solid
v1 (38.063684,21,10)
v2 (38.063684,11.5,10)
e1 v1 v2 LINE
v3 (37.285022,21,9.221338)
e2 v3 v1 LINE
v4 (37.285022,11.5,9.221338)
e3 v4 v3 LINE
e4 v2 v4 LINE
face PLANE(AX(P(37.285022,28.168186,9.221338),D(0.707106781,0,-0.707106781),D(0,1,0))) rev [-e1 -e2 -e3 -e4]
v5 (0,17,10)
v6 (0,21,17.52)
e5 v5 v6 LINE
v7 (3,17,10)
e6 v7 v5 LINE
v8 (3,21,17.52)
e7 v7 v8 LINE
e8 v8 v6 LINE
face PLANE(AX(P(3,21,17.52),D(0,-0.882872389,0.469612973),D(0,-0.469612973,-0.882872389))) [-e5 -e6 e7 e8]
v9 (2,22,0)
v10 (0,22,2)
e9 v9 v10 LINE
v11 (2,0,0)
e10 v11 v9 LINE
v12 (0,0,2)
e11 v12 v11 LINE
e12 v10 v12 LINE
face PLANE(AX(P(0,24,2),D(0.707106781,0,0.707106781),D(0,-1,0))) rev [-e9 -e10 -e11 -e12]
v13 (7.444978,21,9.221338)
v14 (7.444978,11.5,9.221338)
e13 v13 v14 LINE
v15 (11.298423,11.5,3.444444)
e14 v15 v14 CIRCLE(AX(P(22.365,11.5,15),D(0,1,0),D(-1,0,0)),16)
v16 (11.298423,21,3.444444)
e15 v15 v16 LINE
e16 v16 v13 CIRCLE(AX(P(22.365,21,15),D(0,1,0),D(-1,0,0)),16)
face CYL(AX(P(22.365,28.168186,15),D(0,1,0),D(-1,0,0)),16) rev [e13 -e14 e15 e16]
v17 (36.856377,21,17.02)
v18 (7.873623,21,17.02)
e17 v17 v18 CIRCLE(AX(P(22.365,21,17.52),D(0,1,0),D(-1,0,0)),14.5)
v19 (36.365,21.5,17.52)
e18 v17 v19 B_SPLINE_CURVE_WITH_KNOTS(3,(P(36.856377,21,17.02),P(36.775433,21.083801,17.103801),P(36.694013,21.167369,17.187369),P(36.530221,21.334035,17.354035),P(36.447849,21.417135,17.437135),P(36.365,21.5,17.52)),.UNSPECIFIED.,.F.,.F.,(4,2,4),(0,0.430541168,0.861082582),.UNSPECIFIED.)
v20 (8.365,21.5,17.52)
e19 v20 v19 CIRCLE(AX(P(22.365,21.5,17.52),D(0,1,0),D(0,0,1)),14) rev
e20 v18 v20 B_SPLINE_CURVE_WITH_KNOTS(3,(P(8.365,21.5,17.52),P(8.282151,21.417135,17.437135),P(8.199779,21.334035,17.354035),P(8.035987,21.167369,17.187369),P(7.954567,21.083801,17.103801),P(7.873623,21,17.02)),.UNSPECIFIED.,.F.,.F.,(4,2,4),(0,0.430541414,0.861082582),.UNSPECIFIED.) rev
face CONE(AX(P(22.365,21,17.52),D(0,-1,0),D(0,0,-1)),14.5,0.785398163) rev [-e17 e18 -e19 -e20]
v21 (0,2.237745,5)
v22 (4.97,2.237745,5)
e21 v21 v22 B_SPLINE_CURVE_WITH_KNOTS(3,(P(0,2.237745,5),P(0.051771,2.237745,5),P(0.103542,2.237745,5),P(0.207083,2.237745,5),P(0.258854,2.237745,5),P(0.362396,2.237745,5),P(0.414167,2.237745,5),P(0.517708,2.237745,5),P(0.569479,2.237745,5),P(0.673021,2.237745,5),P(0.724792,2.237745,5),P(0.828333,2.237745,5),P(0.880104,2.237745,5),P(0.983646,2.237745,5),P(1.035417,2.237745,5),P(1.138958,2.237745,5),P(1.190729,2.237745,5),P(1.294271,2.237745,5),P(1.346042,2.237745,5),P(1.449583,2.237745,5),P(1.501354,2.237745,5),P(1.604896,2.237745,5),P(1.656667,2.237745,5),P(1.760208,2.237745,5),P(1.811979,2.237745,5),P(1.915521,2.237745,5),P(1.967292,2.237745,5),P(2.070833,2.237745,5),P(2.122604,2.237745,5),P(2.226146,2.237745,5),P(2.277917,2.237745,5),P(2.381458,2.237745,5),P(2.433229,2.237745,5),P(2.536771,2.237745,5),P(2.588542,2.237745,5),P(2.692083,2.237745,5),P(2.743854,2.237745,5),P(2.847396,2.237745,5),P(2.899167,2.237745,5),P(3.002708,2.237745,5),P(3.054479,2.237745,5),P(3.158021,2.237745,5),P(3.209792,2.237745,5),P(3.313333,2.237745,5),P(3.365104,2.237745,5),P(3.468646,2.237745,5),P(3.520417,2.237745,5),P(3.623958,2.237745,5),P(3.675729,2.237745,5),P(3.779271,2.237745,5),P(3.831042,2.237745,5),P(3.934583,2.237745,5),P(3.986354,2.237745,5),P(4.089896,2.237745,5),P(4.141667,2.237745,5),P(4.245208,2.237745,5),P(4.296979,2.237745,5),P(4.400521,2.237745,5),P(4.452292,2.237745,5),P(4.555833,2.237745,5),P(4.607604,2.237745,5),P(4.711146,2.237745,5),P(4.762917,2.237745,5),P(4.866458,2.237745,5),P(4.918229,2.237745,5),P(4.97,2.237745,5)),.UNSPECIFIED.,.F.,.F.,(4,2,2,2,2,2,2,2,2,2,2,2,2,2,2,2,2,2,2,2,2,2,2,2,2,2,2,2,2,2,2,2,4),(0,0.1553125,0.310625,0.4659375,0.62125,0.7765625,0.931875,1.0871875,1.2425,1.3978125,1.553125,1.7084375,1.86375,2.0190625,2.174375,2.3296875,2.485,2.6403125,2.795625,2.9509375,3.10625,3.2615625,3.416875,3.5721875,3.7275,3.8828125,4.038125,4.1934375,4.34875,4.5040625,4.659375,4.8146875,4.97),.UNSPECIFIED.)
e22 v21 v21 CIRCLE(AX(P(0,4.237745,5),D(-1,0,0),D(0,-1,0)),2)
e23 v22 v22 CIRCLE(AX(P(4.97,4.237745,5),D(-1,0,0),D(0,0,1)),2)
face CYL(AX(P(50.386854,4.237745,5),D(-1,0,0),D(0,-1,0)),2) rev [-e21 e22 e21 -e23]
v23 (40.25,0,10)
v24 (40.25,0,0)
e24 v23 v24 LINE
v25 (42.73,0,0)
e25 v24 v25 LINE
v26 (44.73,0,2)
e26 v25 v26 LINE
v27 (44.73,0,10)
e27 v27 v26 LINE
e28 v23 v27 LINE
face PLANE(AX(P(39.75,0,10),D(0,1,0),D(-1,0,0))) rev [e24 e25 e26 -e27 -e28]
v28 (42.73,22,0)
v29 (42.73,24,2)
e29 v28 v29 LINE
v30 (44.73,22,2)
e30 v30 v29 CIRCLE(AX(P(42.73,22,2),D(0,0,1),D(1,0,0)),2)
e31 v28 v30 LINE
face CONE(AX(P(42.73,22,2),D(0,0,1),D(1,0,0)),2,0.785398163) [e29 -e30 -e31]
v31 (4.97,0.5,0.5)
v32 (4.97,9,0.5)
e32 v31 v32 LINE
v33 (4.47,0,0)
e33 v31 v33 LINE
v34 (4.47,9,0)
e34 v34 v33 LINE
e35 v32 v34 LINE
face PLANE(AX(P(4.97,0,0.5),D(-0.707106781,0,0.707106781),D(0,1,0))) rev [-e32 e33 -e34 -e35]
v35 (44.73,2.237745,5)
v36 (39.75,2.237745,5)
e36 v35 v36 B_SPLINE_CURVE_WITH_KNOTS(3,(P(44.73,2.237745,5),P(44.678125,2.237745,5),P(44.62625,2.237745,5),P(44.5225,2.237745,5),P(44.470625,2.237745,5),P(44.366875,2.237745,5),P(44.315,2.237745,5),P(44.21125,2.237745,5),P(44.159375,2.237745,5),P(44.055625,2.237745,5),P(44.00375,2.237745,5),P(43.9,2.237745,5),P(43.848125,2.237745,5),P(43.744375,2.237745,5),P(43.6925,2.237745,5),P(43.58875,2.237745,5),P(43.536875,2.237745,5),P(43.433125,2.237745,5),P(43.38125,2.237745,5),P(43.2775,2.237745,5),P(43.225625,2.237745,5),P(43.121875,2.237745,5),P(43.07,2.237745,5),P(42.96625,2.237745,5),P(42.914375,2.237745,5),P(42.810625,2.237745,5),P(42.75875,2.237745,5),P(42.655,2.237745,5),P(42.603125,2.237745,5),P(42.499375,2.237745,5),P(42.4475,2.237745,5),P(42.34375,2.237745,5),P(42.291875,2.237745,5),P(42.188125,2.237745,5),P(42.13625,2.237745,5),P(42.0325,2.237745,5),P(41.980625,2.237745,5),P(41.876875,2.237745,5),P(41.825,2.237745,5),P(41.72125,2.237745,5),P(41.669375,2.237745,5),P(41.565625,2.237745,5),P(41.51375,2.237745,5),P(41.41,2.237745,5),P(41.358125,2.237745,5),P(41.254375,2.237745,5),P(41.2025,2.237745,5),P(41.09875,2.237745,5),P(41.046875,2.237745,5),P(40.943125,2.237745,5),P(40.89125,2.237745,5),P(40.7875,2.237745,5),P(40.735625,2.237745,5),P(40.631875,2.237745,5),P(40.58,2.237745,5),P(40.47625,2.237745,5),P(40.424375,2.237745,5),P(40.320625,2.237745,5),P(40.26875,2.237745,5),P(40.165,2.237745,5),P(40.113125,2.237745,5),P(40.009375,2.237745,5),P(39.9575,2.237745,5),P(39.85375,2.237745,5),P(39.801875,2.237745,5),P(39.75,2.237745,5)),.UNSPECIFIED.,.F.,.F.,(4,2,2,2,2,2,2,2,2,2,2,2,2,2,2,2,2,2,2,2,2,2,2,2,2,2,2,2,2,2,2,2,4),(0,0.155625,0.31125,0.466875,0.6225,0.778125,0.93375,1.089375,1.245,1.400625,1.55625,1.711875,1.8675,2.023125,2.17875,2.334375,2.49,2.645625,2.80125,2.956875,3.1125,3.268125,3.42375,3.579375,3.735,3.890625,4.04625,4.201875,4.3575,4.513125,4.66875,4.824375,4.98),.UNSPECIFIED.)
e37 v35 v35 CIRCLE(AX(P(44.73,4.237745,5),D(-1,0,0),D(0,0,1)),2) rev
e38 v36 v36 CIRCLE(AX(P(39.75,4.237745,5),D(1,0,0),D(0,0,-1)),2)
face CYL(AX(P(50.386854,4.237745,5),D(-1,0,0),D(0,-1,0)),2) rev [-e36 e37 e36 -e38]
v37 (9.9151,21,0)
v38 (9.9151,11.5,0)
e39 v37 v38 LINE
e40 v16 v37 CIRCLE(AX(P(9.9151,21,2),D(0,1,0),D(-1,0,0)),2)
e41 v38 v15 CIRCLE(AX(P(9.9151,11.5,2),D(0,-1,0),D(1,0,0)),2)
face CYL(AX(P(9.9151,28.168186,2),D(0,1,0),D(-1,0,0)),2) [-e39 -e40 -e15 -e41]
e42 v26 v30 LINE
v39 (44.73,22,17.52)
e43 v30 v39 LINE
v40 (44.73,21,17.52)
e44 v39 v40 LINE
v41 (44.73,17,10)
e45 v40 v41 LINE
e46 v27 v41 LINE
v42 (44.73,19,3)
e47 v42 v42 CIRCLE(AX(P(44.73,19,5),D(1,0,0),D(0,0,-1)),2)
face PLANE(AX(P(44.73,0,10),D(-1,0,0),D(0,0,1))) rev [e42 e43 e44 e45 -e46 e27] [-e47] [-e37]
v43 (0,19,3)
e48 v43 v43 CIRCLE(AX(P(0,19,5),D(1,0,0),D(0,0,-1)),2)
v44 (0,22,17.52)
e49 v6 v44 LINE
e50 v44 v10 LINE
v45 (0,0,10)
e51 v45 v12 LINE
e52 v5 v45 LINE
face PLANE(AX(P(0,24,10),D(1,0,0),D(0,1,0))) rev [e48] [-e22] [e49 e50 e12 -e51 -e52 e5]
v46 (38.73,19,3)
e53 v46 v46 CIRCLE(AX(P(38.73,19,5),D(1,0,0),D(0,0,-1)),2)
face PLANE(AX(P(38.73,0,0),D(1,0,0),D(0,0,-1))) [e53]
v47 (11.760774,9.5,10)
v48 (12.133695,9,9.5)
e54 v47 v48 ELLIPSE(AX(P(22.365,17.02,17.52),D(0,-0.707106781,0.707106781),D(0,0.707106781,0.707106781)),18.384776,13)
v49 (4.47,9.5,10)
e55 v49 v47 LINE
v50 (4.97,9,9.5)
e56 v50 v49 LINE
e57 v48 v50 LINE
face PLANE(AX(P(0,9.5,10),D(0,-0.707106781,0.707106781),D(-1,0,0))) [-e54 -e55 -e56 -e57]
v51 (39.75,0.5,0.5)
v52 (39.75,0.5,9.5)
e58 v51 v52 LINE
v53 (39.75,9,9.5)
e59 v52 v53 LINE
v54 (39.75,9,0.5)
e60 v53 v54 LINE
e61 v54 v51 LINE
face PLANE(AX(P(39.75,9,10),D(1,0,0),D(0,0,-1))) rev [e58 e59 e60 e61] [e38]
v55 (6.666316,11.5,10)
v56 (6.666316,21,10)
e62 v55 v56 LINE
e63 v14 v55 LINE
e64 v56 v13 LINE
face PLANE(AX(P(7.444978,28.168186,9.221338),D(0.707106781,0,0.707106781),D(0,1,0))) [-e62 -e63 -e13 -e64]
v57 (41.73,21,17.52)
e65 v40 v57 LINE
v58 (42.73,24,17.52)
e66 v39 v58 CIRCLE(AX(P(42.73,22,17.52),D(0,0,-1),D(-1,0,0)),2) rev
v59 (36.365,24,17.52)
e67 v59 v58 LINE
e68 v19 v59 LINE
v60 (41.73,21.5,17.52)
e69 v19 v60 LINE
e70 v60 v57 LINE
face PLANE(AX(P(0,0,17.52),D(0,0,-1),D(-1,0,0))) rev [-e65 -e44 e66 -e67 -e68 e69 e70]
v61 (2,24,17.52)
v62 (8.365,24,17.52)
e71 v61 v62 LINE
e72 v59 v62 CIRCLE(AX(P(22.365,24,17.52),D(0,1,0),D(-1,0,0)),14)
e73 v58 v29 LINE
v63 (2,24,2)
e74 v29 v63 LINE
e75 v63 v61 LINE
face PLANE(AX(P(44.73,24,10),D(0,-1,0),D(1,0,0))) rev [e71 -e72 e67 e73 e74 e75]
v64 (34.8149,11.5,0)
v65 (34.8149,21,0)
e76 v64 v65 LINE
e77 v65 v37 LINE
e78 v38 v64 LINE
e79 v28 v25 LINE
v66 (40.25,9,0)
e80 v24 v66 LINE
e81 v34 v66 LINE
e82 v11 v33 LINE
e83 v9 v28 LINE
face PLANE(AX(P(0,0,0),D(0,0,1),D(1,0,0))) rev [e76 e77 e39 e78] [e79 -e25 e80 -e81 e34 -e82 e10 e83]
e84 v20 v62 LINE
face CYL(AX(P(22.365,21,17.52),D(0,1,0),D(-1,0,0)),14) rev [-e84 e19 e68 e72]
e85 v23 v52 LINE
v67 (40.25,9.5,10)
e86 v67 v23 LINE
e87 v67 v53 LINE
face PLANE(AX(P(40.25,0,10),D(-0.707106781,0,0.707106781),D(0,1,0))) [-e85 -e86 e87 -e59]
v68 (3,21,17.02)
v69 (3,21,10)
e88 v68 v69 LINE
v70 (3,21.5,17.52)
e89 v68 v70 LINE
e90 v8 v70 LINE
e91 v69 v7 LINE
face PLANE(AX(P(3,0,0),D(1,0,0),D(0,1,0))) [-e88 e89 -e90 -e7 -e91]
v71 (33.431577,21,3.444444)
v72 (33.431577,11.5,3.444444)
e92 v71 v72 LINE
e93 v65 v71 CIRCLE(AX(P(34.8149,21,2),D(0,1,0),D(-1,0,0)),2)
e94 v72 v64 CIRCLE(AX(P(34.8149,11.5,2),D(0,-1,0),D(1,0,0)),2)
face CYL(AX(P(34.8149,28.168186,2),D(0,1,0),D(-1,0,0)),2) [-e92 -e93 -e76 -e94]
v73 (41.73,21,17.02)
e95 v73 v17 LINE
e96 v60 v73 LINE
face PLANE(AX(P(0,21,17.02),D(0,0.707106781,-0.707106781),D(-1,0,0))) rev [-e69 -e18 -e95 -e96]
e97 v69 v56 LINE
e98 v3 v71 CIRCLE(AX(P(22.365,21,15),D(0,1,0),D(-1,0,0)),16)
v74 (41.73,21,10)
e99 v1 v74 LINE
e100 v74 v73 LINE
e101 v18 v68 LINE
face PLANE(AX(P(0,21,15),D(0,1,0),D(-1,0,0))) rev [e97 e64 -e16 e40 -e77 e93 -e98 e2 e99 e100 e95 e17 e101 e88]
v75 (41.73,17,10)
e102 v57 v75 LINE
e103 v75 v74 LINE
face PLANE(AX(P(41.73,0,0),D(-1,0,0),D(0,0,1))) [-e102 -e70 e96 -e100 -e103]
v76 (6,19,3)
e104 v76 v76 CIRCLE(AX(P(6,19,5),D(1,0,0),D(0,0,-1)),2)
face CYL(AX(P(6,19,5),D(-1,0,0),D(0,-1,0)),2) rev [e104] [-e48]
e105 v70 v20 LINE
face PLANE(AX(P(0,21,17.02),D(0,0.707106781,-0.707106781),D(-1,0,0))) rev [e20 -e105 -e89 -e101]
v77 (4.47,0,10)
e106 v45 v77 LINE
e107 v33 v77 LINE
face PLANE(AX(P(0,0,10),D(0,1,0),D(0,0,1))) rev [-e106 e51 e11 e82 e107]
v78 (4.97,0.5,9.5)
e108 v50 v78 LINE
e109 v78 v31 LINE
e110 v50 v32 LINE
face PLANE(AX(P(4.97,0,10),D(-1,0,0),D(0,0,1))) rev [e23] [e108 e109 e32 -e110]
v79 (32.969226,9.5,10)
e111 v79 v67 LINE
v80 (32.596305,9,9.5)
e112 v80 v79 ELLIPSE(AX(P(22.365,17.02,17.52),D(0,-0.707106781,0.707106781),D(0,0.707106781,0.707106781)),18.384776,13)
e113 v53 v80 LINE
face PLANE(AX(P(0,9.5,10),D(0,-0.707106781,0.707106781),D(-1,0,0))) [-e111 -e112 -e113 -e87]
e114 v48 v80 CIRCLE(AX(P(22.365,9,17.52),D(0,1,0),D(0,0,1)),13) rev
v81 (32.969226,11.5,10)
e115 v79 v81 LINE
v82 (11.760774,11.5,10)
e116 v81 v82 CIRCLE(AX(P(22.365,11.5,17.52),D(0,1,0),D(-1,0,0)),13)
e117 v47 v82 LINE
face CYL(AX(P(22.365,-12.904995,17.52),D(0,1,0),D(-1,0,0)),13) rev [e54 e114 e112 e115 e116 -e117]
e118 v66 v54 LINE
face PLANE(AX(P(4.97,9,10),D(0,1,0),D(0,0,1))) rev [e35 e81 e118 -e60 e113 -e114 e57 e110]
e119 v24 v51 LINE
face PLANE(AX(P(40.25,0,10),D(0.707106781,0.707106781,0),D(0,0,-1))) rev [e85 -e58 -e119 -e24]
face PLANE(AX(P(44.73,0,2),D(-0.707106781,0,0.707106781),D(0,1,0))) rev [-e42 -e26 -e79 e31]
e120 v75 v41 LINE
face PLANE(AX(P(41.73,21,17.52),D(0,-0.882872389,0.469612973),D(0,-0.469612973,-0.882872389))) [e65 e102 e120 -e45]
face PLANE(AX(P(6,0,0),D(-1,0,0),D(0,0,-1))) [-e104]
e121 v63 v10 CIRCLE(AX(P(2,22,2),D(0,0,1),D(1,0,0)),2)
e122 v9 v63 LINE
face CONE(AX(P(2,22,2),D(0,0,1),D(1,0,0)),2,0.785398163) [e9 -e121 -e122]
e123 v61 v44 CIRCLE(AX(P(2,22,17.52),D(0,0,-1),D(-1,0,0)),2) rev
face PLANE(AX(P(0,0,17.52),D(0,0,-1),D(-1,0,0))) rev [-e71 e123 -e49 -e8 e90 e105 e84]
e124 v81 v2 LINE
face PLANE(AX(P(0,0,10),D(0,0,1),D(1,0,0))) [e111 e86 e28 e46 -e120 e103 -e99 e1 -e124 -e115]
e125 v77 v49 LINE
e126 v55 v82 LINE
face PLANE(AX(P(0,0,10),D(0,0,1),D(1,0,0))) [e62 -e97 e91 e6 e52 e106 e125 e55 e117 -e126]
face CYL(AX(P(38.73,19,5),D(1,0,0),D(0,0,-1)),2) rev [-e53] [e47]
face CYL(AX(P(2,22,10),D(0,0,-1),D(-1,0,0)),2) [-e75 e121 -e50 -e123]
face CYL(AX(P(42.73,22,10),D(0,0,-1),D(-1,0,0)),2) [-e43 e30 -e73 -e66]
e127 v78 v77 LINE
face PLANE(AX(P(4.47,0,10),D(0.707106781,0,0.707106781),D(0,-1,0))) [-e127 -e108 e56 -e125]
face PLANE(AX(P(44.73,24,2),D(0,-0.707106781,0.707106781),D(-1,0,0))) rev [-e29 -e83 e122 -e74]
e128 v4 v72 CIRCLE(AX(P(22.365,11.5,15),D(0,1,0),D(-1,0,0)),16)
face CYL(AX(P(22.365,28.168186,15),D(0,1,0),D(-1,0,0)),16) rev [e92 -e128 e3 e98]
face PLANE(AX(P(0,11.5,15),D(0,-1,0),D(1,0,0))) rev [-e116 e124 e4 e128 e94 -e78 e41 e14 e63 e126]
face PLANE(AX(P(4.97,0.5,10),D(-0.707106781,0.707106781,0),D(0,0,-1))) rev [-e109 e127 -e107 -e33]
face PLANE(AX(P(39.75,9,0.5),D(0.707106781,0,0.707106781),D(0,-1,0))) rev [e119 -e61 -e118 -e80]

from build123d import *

# Parameters (mm, degrees)
EXTRUDE_1_DEPTH     = 10
SKETCH_2_W          = 16
SKETCH_2_H          = 9.5
EXTRUDE_2_DEPTH     = 17.52
CUT_EXTRUDE_1_DEPTH = 3
CUT_EXTRUDE_2_DEPTH = 2.5
EXTRUDE_3_DEPTH     = 3
EXTRUDE_4_DEPTH     = 3
FILLET_1_R          = 2
CHAMFER_1_SIZE      = 2
CUT_EXTRUDE_3_DEPTH = 6
CUT_EXTRUDE_4_REACH = 55.7
CHAMFER_2_SIZE      = 0.5
FILLET_2_R          = 2


# Some blends are built 0.0001 mm under size
with BuildPart() as part:
    # 草图1 → 凸台-拉伸1 (new body)
    with BuildSketch(Plane.XY):
        Polygon((0, 0), (4.97, 0), (4.97, 9), (39.75, 9), (39.75, 0), (44.73, 0), (44.73, 24), (0, 24), align=None)
    extrude(amount=EXTRUDE_1_DEPTH)

    # 草图2 → 切除-旋转2 (revolve, cut)
    with BuildSketch(Plane(origin=(0, 0, 15), x_dir=(-1, 0, 0), z_dir=(0, 0, -1))):
        with Locations((-14.365, 16.25)):
            Rectangle(SKETCH_2_W, SKETCH_2_H)
    revolve(axis=Axis((22.365, 28.168186047, 15), (0, -1, 0)), mode=Mode.SUBTRACT)

    # 草图4 → 凸台-拉伸2 (add)
    with BuildSketch(Plane(origin=(0, 0, 0), x_dir=(-1, 0, 0), z_dir=(0, 0, -1))):
        Polygon((-44.73, 24), (0, 24), (0, 21), (-7.166315846, 21), (-37.563684154, 21), (-44.73, 21), align=None)
    extrude(amount=-EXTRUDE_2_DEPTH)

    # 草图5 → 切除-拉伸1 (cut)
    with BuildSketch(Plane(origin=(0, 24, 0), x_dir=(1, 0, 0), z_dir=(0, 1, 0))):
        with BuildLine():
            Line((8.365, -17.52), (36.365, -17.52))
            ThreePointArc((36.365, -17.52), (22.365, -3.52), (8.365, -17.52))
        make_face()
    extrude(amount=-CUT_EXTRUDE_1_DEPTH, mode=Mode.SUBTRACT)

    # 草图6 → 切除-拉伸2 (cut)
    with BuildSketch(Plane(origin=(0, 11.5, 0), x_dir=(1, 0, 0), z_dir=(0, 1, 0))):
        with BuildLine():
            ThreePointArc((32.969225573, -10), (22.365, -4.52), (11.760774427, -10))
            Line((11.760774427, -10), (32.969225573, -10))
        make_face()
    extrude(amount=-CUT_EXTRUDE_2_DEPTH, mode=Mode.SUBTRACT)

    # 草图7 → 凸台-拉伸3 (add)
    with BuildSketch(Plane.ZY):
        Polygon((10, 17), (10, 21), (17.52, 21), align=None)
    extrude(amount=-EXTRUDE_3_DEPTH)

    # 草图8 → 凸台-拉伸4 (add)
    with BuildSketch(Plane(origin=(44.73, 0, 0), x_dir=(0, 0, -1), z_dir=(1, 0, 0))):
        Polygon((-17.52, 21), (-10, 17), (-10, 21), align=None)
    extrude(amount=-EXTRUDE_4_DEPTH)

    # 圆角1
    fillet_1_edges = [part.edges().sort_by_distance(p)[0] for p in [
        (0, 24, 8.76),
        (44.73, 24, 8.76),
    ]]
    fillet(fillet_1_edges, radius=FILLET_1_R)

    # 倒角1
    chamfer_1_edges = [part.edges().sort_by_distance(p)[0] for p in [
        (22.365, 24, 0),
        (0, 11, 0),
        (0.585786438, 23.414213562, 0),
        (44.144213562, 23.414213562, 0),
        (44.73, 11, 0),
    ]]
    chamfer(chamfer_1_edges, length=CHAMFER_1_SIZE - 0.0001)  # a hair under: the kernel refuses the full size

    # 草图9 → 切除-拉伸3 (cut)
    with BuildSketch(Plane(origin=(44.73, 0, 0), x_dir=(0, 0, -1), z_dir=(1, 0, 0))):
        with BuildLine():
            ThreePointArc((-6.414213562, 17.585786438), (-5, 17), (-3.585786438, 17.585786438))
            Line((-3.585786438, 17.585786438), (-5, 19))
            Line((-5, 19), (-6.414213562, 17.585786438))
        make_face()
        with BuildLine():
            Line((-5, 19), (-3.585786438, 17.585786438))
            ThreePointArc((-3.585786438, 17.585786438), (-3.152240935, 18.234633135), (-3, 19))
            ThreePointArc((-3, 19), (-3.152240935, 19.765366865), (-3.585786438, 20.414213562))
            Line((-3.585786438, 20.414213562), (-5, 19))
        make_face()
        with BuildLine():
            ThreePointArc((-6.414213562, 20.414213562), (-7, 19), (-6.414213562, 17.585786438))
            Line((-6.414213562, 17.585786438), (-5, 19))
            Line((-5, 19), (-6.414213562, 20.414213562))
        make_face()
        with BuildLine():
            Line((-6.414213562, 20.414213562), (-5, 19))
            Line((-5, 19), (-3.585786438, 20.414213562))
            ThreePointArc((-3.585786438, 20.414213562), (-5, 21), (-6.414213562, 20.414213562))
        make_face()
    cut_extrude_3 = extrude(amount=-CUT_EXTRUDE_3_DEPTH, mode=Mode.SUBTRACT)

    # 镜向1: 切除-拉伸3 across plane
    add(cut_extrude_3.mirror(Plane(origin=(22.365, 0, 0), x_dir=(0, 0, 1), z_dir=(1, 0, 0))), mode=Mode.SUBTRACT)

    # 切除-拉伸4: up to this face of the body (flat: up to its plane)
    cut_extrude_4_end = Plane(part.part.faces().sort_by_distance((44.73, 11.584828714, 6.907402267))[0])
    # 草图10 → 切除-拉伸4 (cut, up to the picked face)
    with BuildSketch(Plane.ZY, mode=Mode.PRIVATE) as cut_extrude_4_sk1:
        with BuildLine():
            ThreePointArc((3.474277506, 2.944620168), (5, 2.237744629), (6.525722494, 2.944620168))
            Line((6.525722494, 2.944620168), (5, 4.237744629))
            Line((5, 4.237744629), (3.474277506, 2.944620168))
        make_face()
    cut_extrude_4_tool1 = split(extrude(cut_extrude_4_sk1.sketch, amount=-CUT_EXTRUDE_4_REACH, mode=Mode.PRIVATE), bisect_by=cut_extrude_4_end, keep=Keep.BOTH, mode=Mode.PRIVATE)
    # 草图10 → 切除-拉伸4 (cut, up to the picked face)
    with BuildSketch(Plane.ZY, mode=Mode.PRIVATE) as cut_extrude_4_sk2:
        with BuildLine():
            Line((5, 4.237744629), (6.525722494, 2.944620168))
            ThreePointArc((6.525722494, 2.944620168), (6.877690734, 3.549066543), (7, 4.237744629))
            ThreePointArc((7, 4.237744629), (6.877690734, 4.926422715), (6.525722494, 5.53086909))
            Line((6.525722494, 5.53086909), (5, 4.237744629))
        make_face()
    cut_extrude_4_tool2 = split(extrude(cut_extrude_4_sk2.sketch, amount=-CUT_EXTRUDE_4_REACH, mode=Mode.PRIVATE), bisect_by=cut_extrude_4_end, keep=Keep.BOTH, mode=Mode.PRIVATE)
    # 草图10 → 切除-拉伸4 (cut, up to the picked face)
    with BuildSketch(Plane.ZY, mode=Mode.PRIVATE) as cut_extrude_4_sk3:
        with BuildLine():
            ThreePointArc((3.474277506, 5.53086909), (3, 4.237744629), (3.474277506, 2.944620168))
            Line((3.474277506, 2.944620168), (5, 4.237744629))
            Line((5, 4.237744629), (3.474277506, 5.53086909))
        make_face()
    cut_extrude_4_tool3 = split(extrude(cut_extrude_4_sk3.sketch, amount=-CUT_EXTRUDE_4_REACH, mode=Mode.PRIVATE), bisect_by=cut_extrude_4_end, keep=Keep.BOTH, mode=Mode.PRIVATE)
    # 草图10 → 切除-拉伸4 (cut, up to the picked face)
    with BuildSketch(Plane.ZY, mode=Mode.PRIVATE) as cut_extrude_4_sk4:
        with BuildLine():
            Line((5, 4.237744629), (6.525722494, 5.53086909))
            ThreePointArc((6.525722494, 5.53086909), (5, 6.237744629), (3.474277506, 5.53086909))
            Line((3.474277506, 5.53086909), (5, 4.237744629))
        make_face()
    cut_extrude_4_tool4 = split(extrude(cut_extrude_4_sk4.sketch, amount=-CUT_EXTRUDE_4_REACH, mode=Mode.PRIVATE), bisect_by=cut_extrude_4_end, keep=Keep.BOTH, mode=Mode.PRIVATE)
    # 草图10 → 切除-拉伸4 (cut, up to the picked face)
    with BuildSketch(Plane.ZY, mode=Mode.PRIVATE) as cut_extrude_4_sk5:
        with BuildLine():
            ThreePointArc((3.474277506, 2.944620168), (5, 2.237744629), (6.525722494, 2.944620168))
            Line((6.525722494, 2.944620168), (5, 4.237744629))
            Line((5, 4.237744629), (3.474277506, 2.944620168))
        make_face()
    cut_extrude_4_tool5 = split(extrude(cut_extrude_4_sk5.sketch, amount=-CUT_EXTRUDE_4_REACH, mode=Mode.PRIVATE), bisect_by=cut_extrude_4_end, keep=Keep.BOTH, mode=Mode.PRIVATE)
    # 草图10 → 切除-拉伸4 (cut, up to the picked face)
    with BuildSketch(Plane.ZY, mode=Mode.PRIVATE) as cut_extrude_4_sk6:
        with BuildLine():
            Line((5, 4.237744629), (6.525722494, 2.944620168))
            ThreePointArc((6.525722494, 2.944620168), (6.877690734, 3.549066543), (7, 4.237744629))
            ThreePointArc((7, 4.237744629), (6.877690734, 4.926422715), (6.525722494, 5.53086909))
            Line((6.525722494, 5.53086909), (5, 4.237744629))
        make_face()
    cut_extrude_4_tool6 = split(extrude(cut_extrude_4_sk6.sketch, amount=-CUT_EXTRUDE_4_REACH, mode=Mode.PRIVATE), bisect_by=cut_extrude_4_end, keep=Keep.BOTH, mode=Mode.PRIVATE)
    # 草图10 → 切除-拉伸4 (cut, up to the picked face)
    with BuildSketch(Plane.ZY, mode=Mode.PRIVATE) as cut_extrude_4_sk7:
        with BuildLine():
            ThreePointArc((3.474277506, 5.53086909), (3, 4.237744629), (3.474277506, 2.944620168))
            Line((3.474277506, 2.944620168), (5, 4.237744629))
            Line((5, 4.237744629), (3.474277506, 5.53086909))
        make_face()
    cut_extrude_4_tool7 = split(extrude(cut_extrude_4_sk7.sketch, amount=-CUT_EXTRUDE_4_REACH, mode=Mode.PRIVATE), bisect_by=cut_extrude_4_end, keep=Keep.BOTH, mode=Mode.PRIVATE)
    # 草图10 → 切除-拉伸4 (cut, up to the picked face)
    with BuildSketch(Plane.ZY, mode=Mode.PRIVATE) as cut_extrude_4_sk8:
        with BuildLine():
            Line((5, 4.237744629), (6.525722494, 5.53086909))
            ThreePointArc((6.525722494, 5.53086909), (5, 6.237744629), (3.474277506, 5.53086909))
            Line((3.474277506, 5.53086909), (5, 4.237744629))
        make_face()
    cut_extrude_4_tool8 = split(extrude(cut_extrude_4_sk8.sketch, amount=-CUT_EXTRUDE_4_REACH, mode=Mode.PRIVATE), bisect_by=cut_extrude_4_end, keep=Keep.BOTH, mode=Mode.PRIVATE)
    # 草图10 → 切除-拉伸4 (cut, up to the picked face)
    with BuildSketch(Plane.ZY, mode=Mode.PRIVATE) as cut_extrude_4_sk9:
        with BuildLine():
            ThreePointArc((3.474277506, 2.944620168), (5, 2.237744629), (6.525722494, 2.944620168))
            Line((6.525722494, 2.944620168), (5, 4.237744629))
            Line((5, 4.237744629), (3.474277506, 2.944620168))
        make_face()
    cut_extrude_4_tool9 = split(extrude(cut_extrude_4_sk9.sketch, amount=-CUT_EXTRUDE_4_REACH, mode=Mode.PRIVATE), bisect_by=cut_extrude_4_end, keep=Keep.BOTH, mode=Mode.PRIVATE)
    # 草图10 → 切除-拉伸4 (cut, up to the picked face)
    with BuildSketch(Plane.ZY, mode=Mode.PRIVATE) as cut_extrude_4_sk10:
        with BuildLine():
            Line((5, 4.237744629), (6.525722494, 2.944620168))
            ThreePointArc((6.525722494, 2.944620168), (6.877690734, 3.549066543), (7, 4.237744629))
            ThreePointArc((7, 4.237744629), (6.877690734, 4.926422715), (6.525722494, 5.53086909))
            Line((6.525722494, 5.53086909), (5, 4.237744629))
        make_face()
    cut_extrude_4_tool10 = split(extrude(cut_extrude_4_sk10.sketch, amount=-CUT_EXTRUDE_4_REACH, mode=Mode.PRIVATE), bisect_by=cut_extrude_4_end, keep=Keep.BOTH, mode=Mode.PRIVATE)
    # 草图10 → 切除-拉伸4 (cut, up to the picked face)
    with BuildSketch(Plane.ZY, mode=Mode.PRIVATE) as cut_extrude_4_sk11:
        with BuildLine():
            ThreePointArc((3.474277506, 5.53086909), (3, 4.237744629), (3.474277506, 2.944620168))
            Line((3.474277506, 2.944620168), (5, 4.237744629))
            Line((5, 4.237744629), (3.474277506, 5.53086909))
        make_face()
    cut_extrude_4_tool11 = split(extrude(cut_extrude_4_sk11.sketch, amount=-CUT_EXTRUDE_4_REACH, mode=Mode.PRIVATE), bisect_by=cut_extrude_4_end, keep=Keep.BOTH, mode=Mode.PRIVATE)
    # 草图10 → 切除-拉伸4 (cut, up to the picked face)
    with BuildSketch(Plane.ZY, mode=Mode.PRIVATE) as cut_extrude_4_sk12:
        with BuildLine():
            Line((5, 4.237744629), (6.525722494, 5.53086909))
            ThreePointArc((6.525722494, 5.53086909), (5, 6.237744629), (3.474277506, 5.53086909))
            Line((3.474277506, 5.53086909), (5, 4.237744629))
        make_face()
    cut_extrude_4_tool12 = split(extrude(cut_extrude_4_sk12.sketch, amount=-CUT_EXTRUDE_4_REACH, mode=Mode.PRIVATE), bisect_by=cut_extrude_4_end, keep=Keep.BOTH, mode=Mode.PRIVATE)
    # 草图10 → 切除-拉伸4 (cut, up to the picked face)
    with BuildSketch(Plane.ZY, mode=Mode.PRIVATE) as cut_extrude_4_sk13:
        with BuildLine():
            ThreePointArc((3.474277506, 2.944620168), (5, 2.237744629), (6.525722494, 2.944620168))
            Line((6.525722494, 2.944620168), (5, 4.237744629))
            Line((5, 4.237744629), (3.474277506, 2.944620168))
        make_face()
    cut_extrude_4_tool13 = split(extrude(cut_extrude_4_sk13.sketch, amount=-CUT_EXTRUDE_4_REACH, mode=Mode.PRIVATE), bisect_by=cut_extrude_4_end, keep=Keep.BOTH, mode=Mode.PRIVATE)
    # 草图10 → 切除-拉伸4 (cut, up to the picked face)
    with BuildSketch(Plane.ZY, mode=Mode.PRIVATE) as cut_extrude_4_sk14:
        with BuildLine():
            Line((5, 4.237744629), (6.525722494, 2.944620168))
            ThreePointArc((6.525722494, 2.944620168), (6.877690734, 3.549066543), (7, 4.237744629))
            ThreePointArc((7, 4.237744629), (6.877690734, 4.926422715), (6.525722494, 5.53086909))
            Line((6.525722494, 5.53086909), (5, 4.237744629))
        make_face()
    cut_extrude_4_tool14 = split(extrude(cut_extrude_4_sk14.sketch, amount=-CUT_EXTRUDE_4_REACH, mode=Mode.PRIVATE), bisect_by=cut_extrude_4_end, keep=Keep.BOTH, mode=Mode.PRIVATE)
    # 草图10 → 切除-拉伸4 (cut, up to the picked face)
    with BuildSketch(Plane.ZY, mode=Mode.PRIVATE) as cut_extrude_4_sk15:
        with BuildLine():
            ThreePointArc((3.474277506, 5.53086909), (3, 4.237744629), (3.474277506, 2.944620168))
            Line((3.474277506, 2.944620168), (5, 4.237744629))
            Line((5, 4.237744629), (3.474277506, 5.53086909))
        make_face()
    cut_extrude_4_tool15 = split(extrude(cut_extrude_4_sk15.sketch, amount=-CUT_EXTRUDE_4_REACH, mode=Mode.PRIVATE), bisect_by=cut_extrude_4_end, keep=Keep.BOTH, mode=Mode.PRIVATE)
    # 草图10 → 切除-拉伸4 (cut, up to the picked face)
    with BuildSketch(Plane.ZY, mode=Mode.PRIVATE) as cut_extrude_4_sk16:
        with BuildLine():
            Line((5, 4.237744629), (6.525722494, 5.53086909))
            ThreePointArc((6.525722494, 5.53086909), (5, 6.237744629), (3.474277506, 5.53086909))
            Line((3.474277506, 5.53086909), (5, 4.237744629))
        make_face()
    cut_extrude_4_tool16 = split(extrude(cut_extrude_4_sk16.sketch, amount=-CUT_EXTRUDE_4_REACH, mode=Mode.PRIVATE), bisect_by=cut_extrude_4_end, keep=Keep.BOTH, mode=Mode.PRIVATE)
    add(cut_extrude_4_tool1.solids().sort_by(Axis((0, 3.065546, 5), (1, 0, 0)))[0], mode=Mode.SUBTRACT)
    add(cut_extrude_4_tool2.solids().sort_by(Axis((0, 4.237745, 6.226171), (1, 0, 0)))[0], mode=Mode.SUBTRACT)
    add(cut_extrude_4_tool3.solids().sort_by(Axis((0, 4.237745, 3.773829), (1, 0, 0)))[0], mode=Mode.SUBTRACT)
    add(cut_extrude_4_tool4.solids().sort_by(Axis((0, 5.409943, 5), (1, 0, 0)))[0], mode=Mode.SUBTRACT)
    add(cut_extrude_4_tool5.solids().sort_by(Axis((0, 3.065546, 5), (1, 0, 0)))[0], mode=Mode.SUBTRACT)
    add(cut_extrude_4_tool6.solids().sort_by(Axis((0, 4.237745, 6.226171), (1, 0, 0)))[0], mode=Mode.SUBTRACT)
    add(cut_extrude_4_tool7.solids().sort_by(Axis((0, 4.237745, 3.773829), (1, 0, 0)))[0], mode=Mode.SUBTRACT)
    add(cut_extrude_4_tool8.solids().sort_by(Axis((0, 5.409943, 5), (1, 0, 0)))[0], mode=Mode.SUBTRACT)
    add(cut_extrude_4_tool9.solids().sort_by(Axis((0, 3.065546, 5), (1, 0, 0)))[0], mode=Mode.SUBTRACT)
    add(cut_extrude_4_tool10.solids().sort_by(Axis((0, 4.237745, 6.226171), (1, 0, 0)))[0], mode=Mode.SUBTRACT)
    add(cut_extrude_4_tool11.solids().sort_by(Axis((0, 4.237745, 3.773829), (1, 0, 0)))[0], mode=Mode.SUBTRACT)
    add(cut_extrude_4_tool12.solids().sort_by(Axis((0, 5.409943, 5), (1, 0, 0)))[0], mode=Mode.SUBTRACT)
    add(cut_extrude_4_tool13.solids().sort_by(Axis((0, 3.065546, 5), (1, 0, 0)))[0], mode=Mode.SUBTRACT)
    add(cut_extrude_4_tool14.solids().sort_by(Axis((0, 4.237745, 6.226171), (1, 0, 0)))[0], mode=Mode.SUBTRACT)
    add(cut_extrude_4_tool15.solids().sort_by(Axis((0, 4.237745, 3.773829), (1, 0, 0)))[0], mode=Mode.SUBTRACT)
    add(cut_extrude_4_tool16.solids().sort_by(Axis((0, 5.409943, 5), (1, 0, 0)))[0], mode=Mode.SUBTRACT)

    # 倒角2
    # the kernel refuses this chamfer: 0.784414919, 0.5 mm, written as the material it takes off along each edge
    with BuildSketch(Plane(origin=(41.73, 21, 17.52), x_dir=(0, 0, -1), z_dir=(-1, 0, 0))) as chamfer_2_piece_1:
        Polygon((CHAMFER_2_SIZE, 0), (0, -CHAMFER_2_SIZE), (0, 0), align=None)
    extrude(amount=6.650841494, mode=Mode.SUBTRACT)
    with BuildSketch(Plane(origin=(4.97, -1.285841494, 0), x_dir=(-1, 0, 0), z_dir=(0, 1, 0)), Plane(origin=(39.75, 9, 10), x_dir=(0, 0, -1), z_dir=(0, -1, 0)), Plane(origin=(39.75, 9, 0), x_dir=(1, 0, 0), z_dir=(0, -1, 0))) as chamfer_2_piece_2:
        Polygon((CHAMFER_2_SIZE, 0), (0, CHAMFER_2_SIZE), (0, 0), align=None)
    extrude(amount=10.285841494, mode=Mode.SUBTRACT)
    with BuildSketch(Plane(origin=(4.97, -1.285841494, 10), x_dir=(-1, 0, 0), z_dir=(0, 1, 0))) as chamfer_2_piece_3:
        Polygon((CHAMFER_2_SIZE, 0), (0, -CHAMFER_2_SIZE), (0, 0), align=None)
    extrude(amount=10.285841494, mode=Mode.SUBTRACT)
    with BuildSketch(Plane(origin=(39.75, 0, -1.285841494), x_dir=(1, 0, 0), z_dir=(0, 0, 1))) as chamfer_2_piece_4:
        Polygon((CHAMFER_2_SIZE, 0), (0, CHAMFER_2_SIZE), (0, 0), align=None)
    extrude(amount=12.571682988, mode=Mode.SUBTRACT)
    with BuildSketch(Plane(origin=(4.97, 0, -1.285841494), x_dir=(-1, 0, 0), z_dir=(0, 0, 1))) as chamfer_2_piece_5:
        Polygon((CHAMFER_2_SIZE, 0), (0, -CHAMFER_2_SIZE), (0, 0), align=None)
    extrude(amount=12.571682988, mode=Mode.SUBTRACT)
    with BuildSketch(Plane(origin=(4.97, 9, 10), x_dir=(0, 1, 0), z_dir=(1, 0, 0))) as chamfer_2_piece_6:
        Polygon((CHAMFER_2_SIZE, 0), (0, -CHAMFER_2_SIZE), (0, 0), align=None)
    extrude(amount=8.076615921, mode=Mode.SUBTRACT)
    with BuildSketch(Plane(origin=(9.650841494, 21, 17.52), x_dir=(0, 1, 0), z_dir=(-1, 0, 0))) as chamfer_2_piece_7:
        Polygon((CHAMFER_2_SIZE, 0), (0, CHAMFER_2_SIZE), (0, 0), align=None)
    extrude(amount=6.650841494, mode=Mode.SUBTRACT)
    with BuildSketch(Plane(origin=(22.365, 21, 17.52), x_dir=(0.9957715788349903, 0, 0.09186382739942131), z_dir=(-0.09186382739942131, 0, 0.9957715788349903))) as chamfer_2_piece_8:
        Polygon((14 + CHAMFER_2_SIZE, 0), (14, CHAMFER_2_SIZE), (14, 0), align=None)
    revolve(axis=Axis((22.365, 21, 17.52), (0, 1, 0)), revolution_arc=190.541681616, mode=Mode.SUBTRACT)
    with BuildSketch(Plane(origin=(31.683384079, 9, 10), x_dir=(0, 0, -1), z_dir=(1, 0, 0))) as chamfer_2_piece_9:
        Polygon((CHAMFER_2_SIZE, 0), (0, CHAMFER_2_SIZE), (0, 0), align=None)
    extrude(amount=8.066615921, mode=Mode.SUBTRACT)
    with BuildSketch(Plane(origin=(37.563684154, 21, 10), x_dir=(-0.3369457278285583, 0, -0.941524071119843), z_dir=(0, -1, 0))) as chamfer_2_piece_10:
        with BuildLine():
            Line((0.827022677, 0), (-CHAMFER_2_SIZE * 0.336945727829, CHAMFER_2_SIZE * 0.94152407112))
            Line((-CHAMFER_2_SIZE * 0.336945727829, CHAMFER_2_SIZE * 0.94152407112), (0, 0))
            ThreePointArc((0, 0), (0.427704475, 0.005338086), (0.827022677, 0))
        make_face()
    extrude(amount=9.5, mode=Mode.SUBTRACT)
    with BuildSketch(Plane(origin=(7.166315846, 21, 10), x_dir=(-1, 0, 0), z_dir=(0, -1, 0))) as chamfer_2_piece_11:
        with BuildLine():
            Line((CHAMFER_2_SIZE, 0), (-0.278661758, 0.778661758))
            ThreePointArc((-0.278661758, 0.778661758), (-0.139087259, 0.404492704), (0, 0))
            Line((0, 0), (CHAMFER_2_SIZE, 0))
        make_face()
    extrude(amount=9.5, mode=Mode.SUBTRACT)
    with BuildSketch(Plane(origin=(3.684158506, 9, 10), x_dir=(0, 1, 0), z_dir=(1, 0, 0))) as chamfer_2_piece_12a_section:
        Polygon((CHAMFER_2_SIZE, 0), (0, -CHAMFER_2_SIZE), (0, 0), align=None)
    chamfer_2_piece_12a = extrude(amount=9.362457415, mode=Mode.PRIVATE)
    chamfer_2_piece_12a = split(chamfer_2_piece_12a, bisect_by=Plane(origin=(4.97, 9, 10), z_dir=(-1, 0, 0)), keep=Keep.TOP, mode=Mode.PRIVATE)
    with BuildSketch(Plane(origin=(4.97, 0, 10), x_dir=(-1, 0, 0), z_dir=(0, 1, 0))) as chamfer_2_piece_12b_section:
        Polygon((CHAMFER_2_SIZE, 0), (0, -CHAMFER_2_SIZE), (0, 0), align=None)
    chamfer_2_piece_12b = extrude(amount=10.285841494, mode=Mode.PRIVATE)
    chamfer_2_piece_12b = split(chamfer_2_piece_12b, bisect_by=Plane(origin=(4.97, 9, 10), z_dir=(0, 1, 0)), keep=Keep.TOP, mode=Mode.PRIVATE)
    chamfer_2_piece_12 = chamfer_2_piece_12a & chamfer_2_piece_12b
    add(chamfer_2_piece_12, mode=Mode.SUBTRACT)
    with BuildSketch(Plane(origin=(31.683384079, 9, 10), x_dir=(0, 0, -1), z_dir=(1, 0, 0))) as chamfer_2_piece_13a_section:
        Polygon((CHAMFER_2_SIZE, 0), (0, CHAMFER_2_SIZE), (0, 0), align=None)
    chamfer_2_piece_13a = extrude(amount=9.352457415, mode=Mode.PRIVATE)
    chamfer_2_piece_13a = split(chamfer_2_piece_13a, bisect_by=Plane(origin=(39.75, 9, 10), z_dir=(1, 0, 0)), keep=Keep.TOP, mode=Mode.PRIVATE)
    with BuildSketch(Plane(origin=(39.75, 10.285841494, 10), x_dir=(0, 0, -1), z_dir=(0, -1, 0))) as chamfer_2_piece_13b_section:
        Polygon((CHAMFER_2_SIZE, 0), (0, CHAMFER_2_SIZE), (0, 0), align=None)
    chamfer_2_piece_13b = extrude(amount=10.285841494, mode=Mode.PRIVATE)
    chamfer_2_piece_13b = split(chamfer_2_piece_13b, bisect_by=Plane(origin=(39.75, 9, 10), z_dir=(0, 1, 0)), keep=Keep.TOP, mode=Mode.PRIVATE)
    chamfer_2_piece_13 = chamfer_2_piece_13a & chamfer_2_piece_13b
    add(chamfer_2_piece_13, mode=Mode.SUBTRACT)

    # 圆角2
    fillet_2_edges = [part.edges().sort_by_distance(p)[0] for p in [
        (16.797235637, 16.25, 0),
        (27.932764363, 16.25, 0),
    ]]
    fillet(fillet_2_edges, radius=FILLET_2_R)


solid = part.part
